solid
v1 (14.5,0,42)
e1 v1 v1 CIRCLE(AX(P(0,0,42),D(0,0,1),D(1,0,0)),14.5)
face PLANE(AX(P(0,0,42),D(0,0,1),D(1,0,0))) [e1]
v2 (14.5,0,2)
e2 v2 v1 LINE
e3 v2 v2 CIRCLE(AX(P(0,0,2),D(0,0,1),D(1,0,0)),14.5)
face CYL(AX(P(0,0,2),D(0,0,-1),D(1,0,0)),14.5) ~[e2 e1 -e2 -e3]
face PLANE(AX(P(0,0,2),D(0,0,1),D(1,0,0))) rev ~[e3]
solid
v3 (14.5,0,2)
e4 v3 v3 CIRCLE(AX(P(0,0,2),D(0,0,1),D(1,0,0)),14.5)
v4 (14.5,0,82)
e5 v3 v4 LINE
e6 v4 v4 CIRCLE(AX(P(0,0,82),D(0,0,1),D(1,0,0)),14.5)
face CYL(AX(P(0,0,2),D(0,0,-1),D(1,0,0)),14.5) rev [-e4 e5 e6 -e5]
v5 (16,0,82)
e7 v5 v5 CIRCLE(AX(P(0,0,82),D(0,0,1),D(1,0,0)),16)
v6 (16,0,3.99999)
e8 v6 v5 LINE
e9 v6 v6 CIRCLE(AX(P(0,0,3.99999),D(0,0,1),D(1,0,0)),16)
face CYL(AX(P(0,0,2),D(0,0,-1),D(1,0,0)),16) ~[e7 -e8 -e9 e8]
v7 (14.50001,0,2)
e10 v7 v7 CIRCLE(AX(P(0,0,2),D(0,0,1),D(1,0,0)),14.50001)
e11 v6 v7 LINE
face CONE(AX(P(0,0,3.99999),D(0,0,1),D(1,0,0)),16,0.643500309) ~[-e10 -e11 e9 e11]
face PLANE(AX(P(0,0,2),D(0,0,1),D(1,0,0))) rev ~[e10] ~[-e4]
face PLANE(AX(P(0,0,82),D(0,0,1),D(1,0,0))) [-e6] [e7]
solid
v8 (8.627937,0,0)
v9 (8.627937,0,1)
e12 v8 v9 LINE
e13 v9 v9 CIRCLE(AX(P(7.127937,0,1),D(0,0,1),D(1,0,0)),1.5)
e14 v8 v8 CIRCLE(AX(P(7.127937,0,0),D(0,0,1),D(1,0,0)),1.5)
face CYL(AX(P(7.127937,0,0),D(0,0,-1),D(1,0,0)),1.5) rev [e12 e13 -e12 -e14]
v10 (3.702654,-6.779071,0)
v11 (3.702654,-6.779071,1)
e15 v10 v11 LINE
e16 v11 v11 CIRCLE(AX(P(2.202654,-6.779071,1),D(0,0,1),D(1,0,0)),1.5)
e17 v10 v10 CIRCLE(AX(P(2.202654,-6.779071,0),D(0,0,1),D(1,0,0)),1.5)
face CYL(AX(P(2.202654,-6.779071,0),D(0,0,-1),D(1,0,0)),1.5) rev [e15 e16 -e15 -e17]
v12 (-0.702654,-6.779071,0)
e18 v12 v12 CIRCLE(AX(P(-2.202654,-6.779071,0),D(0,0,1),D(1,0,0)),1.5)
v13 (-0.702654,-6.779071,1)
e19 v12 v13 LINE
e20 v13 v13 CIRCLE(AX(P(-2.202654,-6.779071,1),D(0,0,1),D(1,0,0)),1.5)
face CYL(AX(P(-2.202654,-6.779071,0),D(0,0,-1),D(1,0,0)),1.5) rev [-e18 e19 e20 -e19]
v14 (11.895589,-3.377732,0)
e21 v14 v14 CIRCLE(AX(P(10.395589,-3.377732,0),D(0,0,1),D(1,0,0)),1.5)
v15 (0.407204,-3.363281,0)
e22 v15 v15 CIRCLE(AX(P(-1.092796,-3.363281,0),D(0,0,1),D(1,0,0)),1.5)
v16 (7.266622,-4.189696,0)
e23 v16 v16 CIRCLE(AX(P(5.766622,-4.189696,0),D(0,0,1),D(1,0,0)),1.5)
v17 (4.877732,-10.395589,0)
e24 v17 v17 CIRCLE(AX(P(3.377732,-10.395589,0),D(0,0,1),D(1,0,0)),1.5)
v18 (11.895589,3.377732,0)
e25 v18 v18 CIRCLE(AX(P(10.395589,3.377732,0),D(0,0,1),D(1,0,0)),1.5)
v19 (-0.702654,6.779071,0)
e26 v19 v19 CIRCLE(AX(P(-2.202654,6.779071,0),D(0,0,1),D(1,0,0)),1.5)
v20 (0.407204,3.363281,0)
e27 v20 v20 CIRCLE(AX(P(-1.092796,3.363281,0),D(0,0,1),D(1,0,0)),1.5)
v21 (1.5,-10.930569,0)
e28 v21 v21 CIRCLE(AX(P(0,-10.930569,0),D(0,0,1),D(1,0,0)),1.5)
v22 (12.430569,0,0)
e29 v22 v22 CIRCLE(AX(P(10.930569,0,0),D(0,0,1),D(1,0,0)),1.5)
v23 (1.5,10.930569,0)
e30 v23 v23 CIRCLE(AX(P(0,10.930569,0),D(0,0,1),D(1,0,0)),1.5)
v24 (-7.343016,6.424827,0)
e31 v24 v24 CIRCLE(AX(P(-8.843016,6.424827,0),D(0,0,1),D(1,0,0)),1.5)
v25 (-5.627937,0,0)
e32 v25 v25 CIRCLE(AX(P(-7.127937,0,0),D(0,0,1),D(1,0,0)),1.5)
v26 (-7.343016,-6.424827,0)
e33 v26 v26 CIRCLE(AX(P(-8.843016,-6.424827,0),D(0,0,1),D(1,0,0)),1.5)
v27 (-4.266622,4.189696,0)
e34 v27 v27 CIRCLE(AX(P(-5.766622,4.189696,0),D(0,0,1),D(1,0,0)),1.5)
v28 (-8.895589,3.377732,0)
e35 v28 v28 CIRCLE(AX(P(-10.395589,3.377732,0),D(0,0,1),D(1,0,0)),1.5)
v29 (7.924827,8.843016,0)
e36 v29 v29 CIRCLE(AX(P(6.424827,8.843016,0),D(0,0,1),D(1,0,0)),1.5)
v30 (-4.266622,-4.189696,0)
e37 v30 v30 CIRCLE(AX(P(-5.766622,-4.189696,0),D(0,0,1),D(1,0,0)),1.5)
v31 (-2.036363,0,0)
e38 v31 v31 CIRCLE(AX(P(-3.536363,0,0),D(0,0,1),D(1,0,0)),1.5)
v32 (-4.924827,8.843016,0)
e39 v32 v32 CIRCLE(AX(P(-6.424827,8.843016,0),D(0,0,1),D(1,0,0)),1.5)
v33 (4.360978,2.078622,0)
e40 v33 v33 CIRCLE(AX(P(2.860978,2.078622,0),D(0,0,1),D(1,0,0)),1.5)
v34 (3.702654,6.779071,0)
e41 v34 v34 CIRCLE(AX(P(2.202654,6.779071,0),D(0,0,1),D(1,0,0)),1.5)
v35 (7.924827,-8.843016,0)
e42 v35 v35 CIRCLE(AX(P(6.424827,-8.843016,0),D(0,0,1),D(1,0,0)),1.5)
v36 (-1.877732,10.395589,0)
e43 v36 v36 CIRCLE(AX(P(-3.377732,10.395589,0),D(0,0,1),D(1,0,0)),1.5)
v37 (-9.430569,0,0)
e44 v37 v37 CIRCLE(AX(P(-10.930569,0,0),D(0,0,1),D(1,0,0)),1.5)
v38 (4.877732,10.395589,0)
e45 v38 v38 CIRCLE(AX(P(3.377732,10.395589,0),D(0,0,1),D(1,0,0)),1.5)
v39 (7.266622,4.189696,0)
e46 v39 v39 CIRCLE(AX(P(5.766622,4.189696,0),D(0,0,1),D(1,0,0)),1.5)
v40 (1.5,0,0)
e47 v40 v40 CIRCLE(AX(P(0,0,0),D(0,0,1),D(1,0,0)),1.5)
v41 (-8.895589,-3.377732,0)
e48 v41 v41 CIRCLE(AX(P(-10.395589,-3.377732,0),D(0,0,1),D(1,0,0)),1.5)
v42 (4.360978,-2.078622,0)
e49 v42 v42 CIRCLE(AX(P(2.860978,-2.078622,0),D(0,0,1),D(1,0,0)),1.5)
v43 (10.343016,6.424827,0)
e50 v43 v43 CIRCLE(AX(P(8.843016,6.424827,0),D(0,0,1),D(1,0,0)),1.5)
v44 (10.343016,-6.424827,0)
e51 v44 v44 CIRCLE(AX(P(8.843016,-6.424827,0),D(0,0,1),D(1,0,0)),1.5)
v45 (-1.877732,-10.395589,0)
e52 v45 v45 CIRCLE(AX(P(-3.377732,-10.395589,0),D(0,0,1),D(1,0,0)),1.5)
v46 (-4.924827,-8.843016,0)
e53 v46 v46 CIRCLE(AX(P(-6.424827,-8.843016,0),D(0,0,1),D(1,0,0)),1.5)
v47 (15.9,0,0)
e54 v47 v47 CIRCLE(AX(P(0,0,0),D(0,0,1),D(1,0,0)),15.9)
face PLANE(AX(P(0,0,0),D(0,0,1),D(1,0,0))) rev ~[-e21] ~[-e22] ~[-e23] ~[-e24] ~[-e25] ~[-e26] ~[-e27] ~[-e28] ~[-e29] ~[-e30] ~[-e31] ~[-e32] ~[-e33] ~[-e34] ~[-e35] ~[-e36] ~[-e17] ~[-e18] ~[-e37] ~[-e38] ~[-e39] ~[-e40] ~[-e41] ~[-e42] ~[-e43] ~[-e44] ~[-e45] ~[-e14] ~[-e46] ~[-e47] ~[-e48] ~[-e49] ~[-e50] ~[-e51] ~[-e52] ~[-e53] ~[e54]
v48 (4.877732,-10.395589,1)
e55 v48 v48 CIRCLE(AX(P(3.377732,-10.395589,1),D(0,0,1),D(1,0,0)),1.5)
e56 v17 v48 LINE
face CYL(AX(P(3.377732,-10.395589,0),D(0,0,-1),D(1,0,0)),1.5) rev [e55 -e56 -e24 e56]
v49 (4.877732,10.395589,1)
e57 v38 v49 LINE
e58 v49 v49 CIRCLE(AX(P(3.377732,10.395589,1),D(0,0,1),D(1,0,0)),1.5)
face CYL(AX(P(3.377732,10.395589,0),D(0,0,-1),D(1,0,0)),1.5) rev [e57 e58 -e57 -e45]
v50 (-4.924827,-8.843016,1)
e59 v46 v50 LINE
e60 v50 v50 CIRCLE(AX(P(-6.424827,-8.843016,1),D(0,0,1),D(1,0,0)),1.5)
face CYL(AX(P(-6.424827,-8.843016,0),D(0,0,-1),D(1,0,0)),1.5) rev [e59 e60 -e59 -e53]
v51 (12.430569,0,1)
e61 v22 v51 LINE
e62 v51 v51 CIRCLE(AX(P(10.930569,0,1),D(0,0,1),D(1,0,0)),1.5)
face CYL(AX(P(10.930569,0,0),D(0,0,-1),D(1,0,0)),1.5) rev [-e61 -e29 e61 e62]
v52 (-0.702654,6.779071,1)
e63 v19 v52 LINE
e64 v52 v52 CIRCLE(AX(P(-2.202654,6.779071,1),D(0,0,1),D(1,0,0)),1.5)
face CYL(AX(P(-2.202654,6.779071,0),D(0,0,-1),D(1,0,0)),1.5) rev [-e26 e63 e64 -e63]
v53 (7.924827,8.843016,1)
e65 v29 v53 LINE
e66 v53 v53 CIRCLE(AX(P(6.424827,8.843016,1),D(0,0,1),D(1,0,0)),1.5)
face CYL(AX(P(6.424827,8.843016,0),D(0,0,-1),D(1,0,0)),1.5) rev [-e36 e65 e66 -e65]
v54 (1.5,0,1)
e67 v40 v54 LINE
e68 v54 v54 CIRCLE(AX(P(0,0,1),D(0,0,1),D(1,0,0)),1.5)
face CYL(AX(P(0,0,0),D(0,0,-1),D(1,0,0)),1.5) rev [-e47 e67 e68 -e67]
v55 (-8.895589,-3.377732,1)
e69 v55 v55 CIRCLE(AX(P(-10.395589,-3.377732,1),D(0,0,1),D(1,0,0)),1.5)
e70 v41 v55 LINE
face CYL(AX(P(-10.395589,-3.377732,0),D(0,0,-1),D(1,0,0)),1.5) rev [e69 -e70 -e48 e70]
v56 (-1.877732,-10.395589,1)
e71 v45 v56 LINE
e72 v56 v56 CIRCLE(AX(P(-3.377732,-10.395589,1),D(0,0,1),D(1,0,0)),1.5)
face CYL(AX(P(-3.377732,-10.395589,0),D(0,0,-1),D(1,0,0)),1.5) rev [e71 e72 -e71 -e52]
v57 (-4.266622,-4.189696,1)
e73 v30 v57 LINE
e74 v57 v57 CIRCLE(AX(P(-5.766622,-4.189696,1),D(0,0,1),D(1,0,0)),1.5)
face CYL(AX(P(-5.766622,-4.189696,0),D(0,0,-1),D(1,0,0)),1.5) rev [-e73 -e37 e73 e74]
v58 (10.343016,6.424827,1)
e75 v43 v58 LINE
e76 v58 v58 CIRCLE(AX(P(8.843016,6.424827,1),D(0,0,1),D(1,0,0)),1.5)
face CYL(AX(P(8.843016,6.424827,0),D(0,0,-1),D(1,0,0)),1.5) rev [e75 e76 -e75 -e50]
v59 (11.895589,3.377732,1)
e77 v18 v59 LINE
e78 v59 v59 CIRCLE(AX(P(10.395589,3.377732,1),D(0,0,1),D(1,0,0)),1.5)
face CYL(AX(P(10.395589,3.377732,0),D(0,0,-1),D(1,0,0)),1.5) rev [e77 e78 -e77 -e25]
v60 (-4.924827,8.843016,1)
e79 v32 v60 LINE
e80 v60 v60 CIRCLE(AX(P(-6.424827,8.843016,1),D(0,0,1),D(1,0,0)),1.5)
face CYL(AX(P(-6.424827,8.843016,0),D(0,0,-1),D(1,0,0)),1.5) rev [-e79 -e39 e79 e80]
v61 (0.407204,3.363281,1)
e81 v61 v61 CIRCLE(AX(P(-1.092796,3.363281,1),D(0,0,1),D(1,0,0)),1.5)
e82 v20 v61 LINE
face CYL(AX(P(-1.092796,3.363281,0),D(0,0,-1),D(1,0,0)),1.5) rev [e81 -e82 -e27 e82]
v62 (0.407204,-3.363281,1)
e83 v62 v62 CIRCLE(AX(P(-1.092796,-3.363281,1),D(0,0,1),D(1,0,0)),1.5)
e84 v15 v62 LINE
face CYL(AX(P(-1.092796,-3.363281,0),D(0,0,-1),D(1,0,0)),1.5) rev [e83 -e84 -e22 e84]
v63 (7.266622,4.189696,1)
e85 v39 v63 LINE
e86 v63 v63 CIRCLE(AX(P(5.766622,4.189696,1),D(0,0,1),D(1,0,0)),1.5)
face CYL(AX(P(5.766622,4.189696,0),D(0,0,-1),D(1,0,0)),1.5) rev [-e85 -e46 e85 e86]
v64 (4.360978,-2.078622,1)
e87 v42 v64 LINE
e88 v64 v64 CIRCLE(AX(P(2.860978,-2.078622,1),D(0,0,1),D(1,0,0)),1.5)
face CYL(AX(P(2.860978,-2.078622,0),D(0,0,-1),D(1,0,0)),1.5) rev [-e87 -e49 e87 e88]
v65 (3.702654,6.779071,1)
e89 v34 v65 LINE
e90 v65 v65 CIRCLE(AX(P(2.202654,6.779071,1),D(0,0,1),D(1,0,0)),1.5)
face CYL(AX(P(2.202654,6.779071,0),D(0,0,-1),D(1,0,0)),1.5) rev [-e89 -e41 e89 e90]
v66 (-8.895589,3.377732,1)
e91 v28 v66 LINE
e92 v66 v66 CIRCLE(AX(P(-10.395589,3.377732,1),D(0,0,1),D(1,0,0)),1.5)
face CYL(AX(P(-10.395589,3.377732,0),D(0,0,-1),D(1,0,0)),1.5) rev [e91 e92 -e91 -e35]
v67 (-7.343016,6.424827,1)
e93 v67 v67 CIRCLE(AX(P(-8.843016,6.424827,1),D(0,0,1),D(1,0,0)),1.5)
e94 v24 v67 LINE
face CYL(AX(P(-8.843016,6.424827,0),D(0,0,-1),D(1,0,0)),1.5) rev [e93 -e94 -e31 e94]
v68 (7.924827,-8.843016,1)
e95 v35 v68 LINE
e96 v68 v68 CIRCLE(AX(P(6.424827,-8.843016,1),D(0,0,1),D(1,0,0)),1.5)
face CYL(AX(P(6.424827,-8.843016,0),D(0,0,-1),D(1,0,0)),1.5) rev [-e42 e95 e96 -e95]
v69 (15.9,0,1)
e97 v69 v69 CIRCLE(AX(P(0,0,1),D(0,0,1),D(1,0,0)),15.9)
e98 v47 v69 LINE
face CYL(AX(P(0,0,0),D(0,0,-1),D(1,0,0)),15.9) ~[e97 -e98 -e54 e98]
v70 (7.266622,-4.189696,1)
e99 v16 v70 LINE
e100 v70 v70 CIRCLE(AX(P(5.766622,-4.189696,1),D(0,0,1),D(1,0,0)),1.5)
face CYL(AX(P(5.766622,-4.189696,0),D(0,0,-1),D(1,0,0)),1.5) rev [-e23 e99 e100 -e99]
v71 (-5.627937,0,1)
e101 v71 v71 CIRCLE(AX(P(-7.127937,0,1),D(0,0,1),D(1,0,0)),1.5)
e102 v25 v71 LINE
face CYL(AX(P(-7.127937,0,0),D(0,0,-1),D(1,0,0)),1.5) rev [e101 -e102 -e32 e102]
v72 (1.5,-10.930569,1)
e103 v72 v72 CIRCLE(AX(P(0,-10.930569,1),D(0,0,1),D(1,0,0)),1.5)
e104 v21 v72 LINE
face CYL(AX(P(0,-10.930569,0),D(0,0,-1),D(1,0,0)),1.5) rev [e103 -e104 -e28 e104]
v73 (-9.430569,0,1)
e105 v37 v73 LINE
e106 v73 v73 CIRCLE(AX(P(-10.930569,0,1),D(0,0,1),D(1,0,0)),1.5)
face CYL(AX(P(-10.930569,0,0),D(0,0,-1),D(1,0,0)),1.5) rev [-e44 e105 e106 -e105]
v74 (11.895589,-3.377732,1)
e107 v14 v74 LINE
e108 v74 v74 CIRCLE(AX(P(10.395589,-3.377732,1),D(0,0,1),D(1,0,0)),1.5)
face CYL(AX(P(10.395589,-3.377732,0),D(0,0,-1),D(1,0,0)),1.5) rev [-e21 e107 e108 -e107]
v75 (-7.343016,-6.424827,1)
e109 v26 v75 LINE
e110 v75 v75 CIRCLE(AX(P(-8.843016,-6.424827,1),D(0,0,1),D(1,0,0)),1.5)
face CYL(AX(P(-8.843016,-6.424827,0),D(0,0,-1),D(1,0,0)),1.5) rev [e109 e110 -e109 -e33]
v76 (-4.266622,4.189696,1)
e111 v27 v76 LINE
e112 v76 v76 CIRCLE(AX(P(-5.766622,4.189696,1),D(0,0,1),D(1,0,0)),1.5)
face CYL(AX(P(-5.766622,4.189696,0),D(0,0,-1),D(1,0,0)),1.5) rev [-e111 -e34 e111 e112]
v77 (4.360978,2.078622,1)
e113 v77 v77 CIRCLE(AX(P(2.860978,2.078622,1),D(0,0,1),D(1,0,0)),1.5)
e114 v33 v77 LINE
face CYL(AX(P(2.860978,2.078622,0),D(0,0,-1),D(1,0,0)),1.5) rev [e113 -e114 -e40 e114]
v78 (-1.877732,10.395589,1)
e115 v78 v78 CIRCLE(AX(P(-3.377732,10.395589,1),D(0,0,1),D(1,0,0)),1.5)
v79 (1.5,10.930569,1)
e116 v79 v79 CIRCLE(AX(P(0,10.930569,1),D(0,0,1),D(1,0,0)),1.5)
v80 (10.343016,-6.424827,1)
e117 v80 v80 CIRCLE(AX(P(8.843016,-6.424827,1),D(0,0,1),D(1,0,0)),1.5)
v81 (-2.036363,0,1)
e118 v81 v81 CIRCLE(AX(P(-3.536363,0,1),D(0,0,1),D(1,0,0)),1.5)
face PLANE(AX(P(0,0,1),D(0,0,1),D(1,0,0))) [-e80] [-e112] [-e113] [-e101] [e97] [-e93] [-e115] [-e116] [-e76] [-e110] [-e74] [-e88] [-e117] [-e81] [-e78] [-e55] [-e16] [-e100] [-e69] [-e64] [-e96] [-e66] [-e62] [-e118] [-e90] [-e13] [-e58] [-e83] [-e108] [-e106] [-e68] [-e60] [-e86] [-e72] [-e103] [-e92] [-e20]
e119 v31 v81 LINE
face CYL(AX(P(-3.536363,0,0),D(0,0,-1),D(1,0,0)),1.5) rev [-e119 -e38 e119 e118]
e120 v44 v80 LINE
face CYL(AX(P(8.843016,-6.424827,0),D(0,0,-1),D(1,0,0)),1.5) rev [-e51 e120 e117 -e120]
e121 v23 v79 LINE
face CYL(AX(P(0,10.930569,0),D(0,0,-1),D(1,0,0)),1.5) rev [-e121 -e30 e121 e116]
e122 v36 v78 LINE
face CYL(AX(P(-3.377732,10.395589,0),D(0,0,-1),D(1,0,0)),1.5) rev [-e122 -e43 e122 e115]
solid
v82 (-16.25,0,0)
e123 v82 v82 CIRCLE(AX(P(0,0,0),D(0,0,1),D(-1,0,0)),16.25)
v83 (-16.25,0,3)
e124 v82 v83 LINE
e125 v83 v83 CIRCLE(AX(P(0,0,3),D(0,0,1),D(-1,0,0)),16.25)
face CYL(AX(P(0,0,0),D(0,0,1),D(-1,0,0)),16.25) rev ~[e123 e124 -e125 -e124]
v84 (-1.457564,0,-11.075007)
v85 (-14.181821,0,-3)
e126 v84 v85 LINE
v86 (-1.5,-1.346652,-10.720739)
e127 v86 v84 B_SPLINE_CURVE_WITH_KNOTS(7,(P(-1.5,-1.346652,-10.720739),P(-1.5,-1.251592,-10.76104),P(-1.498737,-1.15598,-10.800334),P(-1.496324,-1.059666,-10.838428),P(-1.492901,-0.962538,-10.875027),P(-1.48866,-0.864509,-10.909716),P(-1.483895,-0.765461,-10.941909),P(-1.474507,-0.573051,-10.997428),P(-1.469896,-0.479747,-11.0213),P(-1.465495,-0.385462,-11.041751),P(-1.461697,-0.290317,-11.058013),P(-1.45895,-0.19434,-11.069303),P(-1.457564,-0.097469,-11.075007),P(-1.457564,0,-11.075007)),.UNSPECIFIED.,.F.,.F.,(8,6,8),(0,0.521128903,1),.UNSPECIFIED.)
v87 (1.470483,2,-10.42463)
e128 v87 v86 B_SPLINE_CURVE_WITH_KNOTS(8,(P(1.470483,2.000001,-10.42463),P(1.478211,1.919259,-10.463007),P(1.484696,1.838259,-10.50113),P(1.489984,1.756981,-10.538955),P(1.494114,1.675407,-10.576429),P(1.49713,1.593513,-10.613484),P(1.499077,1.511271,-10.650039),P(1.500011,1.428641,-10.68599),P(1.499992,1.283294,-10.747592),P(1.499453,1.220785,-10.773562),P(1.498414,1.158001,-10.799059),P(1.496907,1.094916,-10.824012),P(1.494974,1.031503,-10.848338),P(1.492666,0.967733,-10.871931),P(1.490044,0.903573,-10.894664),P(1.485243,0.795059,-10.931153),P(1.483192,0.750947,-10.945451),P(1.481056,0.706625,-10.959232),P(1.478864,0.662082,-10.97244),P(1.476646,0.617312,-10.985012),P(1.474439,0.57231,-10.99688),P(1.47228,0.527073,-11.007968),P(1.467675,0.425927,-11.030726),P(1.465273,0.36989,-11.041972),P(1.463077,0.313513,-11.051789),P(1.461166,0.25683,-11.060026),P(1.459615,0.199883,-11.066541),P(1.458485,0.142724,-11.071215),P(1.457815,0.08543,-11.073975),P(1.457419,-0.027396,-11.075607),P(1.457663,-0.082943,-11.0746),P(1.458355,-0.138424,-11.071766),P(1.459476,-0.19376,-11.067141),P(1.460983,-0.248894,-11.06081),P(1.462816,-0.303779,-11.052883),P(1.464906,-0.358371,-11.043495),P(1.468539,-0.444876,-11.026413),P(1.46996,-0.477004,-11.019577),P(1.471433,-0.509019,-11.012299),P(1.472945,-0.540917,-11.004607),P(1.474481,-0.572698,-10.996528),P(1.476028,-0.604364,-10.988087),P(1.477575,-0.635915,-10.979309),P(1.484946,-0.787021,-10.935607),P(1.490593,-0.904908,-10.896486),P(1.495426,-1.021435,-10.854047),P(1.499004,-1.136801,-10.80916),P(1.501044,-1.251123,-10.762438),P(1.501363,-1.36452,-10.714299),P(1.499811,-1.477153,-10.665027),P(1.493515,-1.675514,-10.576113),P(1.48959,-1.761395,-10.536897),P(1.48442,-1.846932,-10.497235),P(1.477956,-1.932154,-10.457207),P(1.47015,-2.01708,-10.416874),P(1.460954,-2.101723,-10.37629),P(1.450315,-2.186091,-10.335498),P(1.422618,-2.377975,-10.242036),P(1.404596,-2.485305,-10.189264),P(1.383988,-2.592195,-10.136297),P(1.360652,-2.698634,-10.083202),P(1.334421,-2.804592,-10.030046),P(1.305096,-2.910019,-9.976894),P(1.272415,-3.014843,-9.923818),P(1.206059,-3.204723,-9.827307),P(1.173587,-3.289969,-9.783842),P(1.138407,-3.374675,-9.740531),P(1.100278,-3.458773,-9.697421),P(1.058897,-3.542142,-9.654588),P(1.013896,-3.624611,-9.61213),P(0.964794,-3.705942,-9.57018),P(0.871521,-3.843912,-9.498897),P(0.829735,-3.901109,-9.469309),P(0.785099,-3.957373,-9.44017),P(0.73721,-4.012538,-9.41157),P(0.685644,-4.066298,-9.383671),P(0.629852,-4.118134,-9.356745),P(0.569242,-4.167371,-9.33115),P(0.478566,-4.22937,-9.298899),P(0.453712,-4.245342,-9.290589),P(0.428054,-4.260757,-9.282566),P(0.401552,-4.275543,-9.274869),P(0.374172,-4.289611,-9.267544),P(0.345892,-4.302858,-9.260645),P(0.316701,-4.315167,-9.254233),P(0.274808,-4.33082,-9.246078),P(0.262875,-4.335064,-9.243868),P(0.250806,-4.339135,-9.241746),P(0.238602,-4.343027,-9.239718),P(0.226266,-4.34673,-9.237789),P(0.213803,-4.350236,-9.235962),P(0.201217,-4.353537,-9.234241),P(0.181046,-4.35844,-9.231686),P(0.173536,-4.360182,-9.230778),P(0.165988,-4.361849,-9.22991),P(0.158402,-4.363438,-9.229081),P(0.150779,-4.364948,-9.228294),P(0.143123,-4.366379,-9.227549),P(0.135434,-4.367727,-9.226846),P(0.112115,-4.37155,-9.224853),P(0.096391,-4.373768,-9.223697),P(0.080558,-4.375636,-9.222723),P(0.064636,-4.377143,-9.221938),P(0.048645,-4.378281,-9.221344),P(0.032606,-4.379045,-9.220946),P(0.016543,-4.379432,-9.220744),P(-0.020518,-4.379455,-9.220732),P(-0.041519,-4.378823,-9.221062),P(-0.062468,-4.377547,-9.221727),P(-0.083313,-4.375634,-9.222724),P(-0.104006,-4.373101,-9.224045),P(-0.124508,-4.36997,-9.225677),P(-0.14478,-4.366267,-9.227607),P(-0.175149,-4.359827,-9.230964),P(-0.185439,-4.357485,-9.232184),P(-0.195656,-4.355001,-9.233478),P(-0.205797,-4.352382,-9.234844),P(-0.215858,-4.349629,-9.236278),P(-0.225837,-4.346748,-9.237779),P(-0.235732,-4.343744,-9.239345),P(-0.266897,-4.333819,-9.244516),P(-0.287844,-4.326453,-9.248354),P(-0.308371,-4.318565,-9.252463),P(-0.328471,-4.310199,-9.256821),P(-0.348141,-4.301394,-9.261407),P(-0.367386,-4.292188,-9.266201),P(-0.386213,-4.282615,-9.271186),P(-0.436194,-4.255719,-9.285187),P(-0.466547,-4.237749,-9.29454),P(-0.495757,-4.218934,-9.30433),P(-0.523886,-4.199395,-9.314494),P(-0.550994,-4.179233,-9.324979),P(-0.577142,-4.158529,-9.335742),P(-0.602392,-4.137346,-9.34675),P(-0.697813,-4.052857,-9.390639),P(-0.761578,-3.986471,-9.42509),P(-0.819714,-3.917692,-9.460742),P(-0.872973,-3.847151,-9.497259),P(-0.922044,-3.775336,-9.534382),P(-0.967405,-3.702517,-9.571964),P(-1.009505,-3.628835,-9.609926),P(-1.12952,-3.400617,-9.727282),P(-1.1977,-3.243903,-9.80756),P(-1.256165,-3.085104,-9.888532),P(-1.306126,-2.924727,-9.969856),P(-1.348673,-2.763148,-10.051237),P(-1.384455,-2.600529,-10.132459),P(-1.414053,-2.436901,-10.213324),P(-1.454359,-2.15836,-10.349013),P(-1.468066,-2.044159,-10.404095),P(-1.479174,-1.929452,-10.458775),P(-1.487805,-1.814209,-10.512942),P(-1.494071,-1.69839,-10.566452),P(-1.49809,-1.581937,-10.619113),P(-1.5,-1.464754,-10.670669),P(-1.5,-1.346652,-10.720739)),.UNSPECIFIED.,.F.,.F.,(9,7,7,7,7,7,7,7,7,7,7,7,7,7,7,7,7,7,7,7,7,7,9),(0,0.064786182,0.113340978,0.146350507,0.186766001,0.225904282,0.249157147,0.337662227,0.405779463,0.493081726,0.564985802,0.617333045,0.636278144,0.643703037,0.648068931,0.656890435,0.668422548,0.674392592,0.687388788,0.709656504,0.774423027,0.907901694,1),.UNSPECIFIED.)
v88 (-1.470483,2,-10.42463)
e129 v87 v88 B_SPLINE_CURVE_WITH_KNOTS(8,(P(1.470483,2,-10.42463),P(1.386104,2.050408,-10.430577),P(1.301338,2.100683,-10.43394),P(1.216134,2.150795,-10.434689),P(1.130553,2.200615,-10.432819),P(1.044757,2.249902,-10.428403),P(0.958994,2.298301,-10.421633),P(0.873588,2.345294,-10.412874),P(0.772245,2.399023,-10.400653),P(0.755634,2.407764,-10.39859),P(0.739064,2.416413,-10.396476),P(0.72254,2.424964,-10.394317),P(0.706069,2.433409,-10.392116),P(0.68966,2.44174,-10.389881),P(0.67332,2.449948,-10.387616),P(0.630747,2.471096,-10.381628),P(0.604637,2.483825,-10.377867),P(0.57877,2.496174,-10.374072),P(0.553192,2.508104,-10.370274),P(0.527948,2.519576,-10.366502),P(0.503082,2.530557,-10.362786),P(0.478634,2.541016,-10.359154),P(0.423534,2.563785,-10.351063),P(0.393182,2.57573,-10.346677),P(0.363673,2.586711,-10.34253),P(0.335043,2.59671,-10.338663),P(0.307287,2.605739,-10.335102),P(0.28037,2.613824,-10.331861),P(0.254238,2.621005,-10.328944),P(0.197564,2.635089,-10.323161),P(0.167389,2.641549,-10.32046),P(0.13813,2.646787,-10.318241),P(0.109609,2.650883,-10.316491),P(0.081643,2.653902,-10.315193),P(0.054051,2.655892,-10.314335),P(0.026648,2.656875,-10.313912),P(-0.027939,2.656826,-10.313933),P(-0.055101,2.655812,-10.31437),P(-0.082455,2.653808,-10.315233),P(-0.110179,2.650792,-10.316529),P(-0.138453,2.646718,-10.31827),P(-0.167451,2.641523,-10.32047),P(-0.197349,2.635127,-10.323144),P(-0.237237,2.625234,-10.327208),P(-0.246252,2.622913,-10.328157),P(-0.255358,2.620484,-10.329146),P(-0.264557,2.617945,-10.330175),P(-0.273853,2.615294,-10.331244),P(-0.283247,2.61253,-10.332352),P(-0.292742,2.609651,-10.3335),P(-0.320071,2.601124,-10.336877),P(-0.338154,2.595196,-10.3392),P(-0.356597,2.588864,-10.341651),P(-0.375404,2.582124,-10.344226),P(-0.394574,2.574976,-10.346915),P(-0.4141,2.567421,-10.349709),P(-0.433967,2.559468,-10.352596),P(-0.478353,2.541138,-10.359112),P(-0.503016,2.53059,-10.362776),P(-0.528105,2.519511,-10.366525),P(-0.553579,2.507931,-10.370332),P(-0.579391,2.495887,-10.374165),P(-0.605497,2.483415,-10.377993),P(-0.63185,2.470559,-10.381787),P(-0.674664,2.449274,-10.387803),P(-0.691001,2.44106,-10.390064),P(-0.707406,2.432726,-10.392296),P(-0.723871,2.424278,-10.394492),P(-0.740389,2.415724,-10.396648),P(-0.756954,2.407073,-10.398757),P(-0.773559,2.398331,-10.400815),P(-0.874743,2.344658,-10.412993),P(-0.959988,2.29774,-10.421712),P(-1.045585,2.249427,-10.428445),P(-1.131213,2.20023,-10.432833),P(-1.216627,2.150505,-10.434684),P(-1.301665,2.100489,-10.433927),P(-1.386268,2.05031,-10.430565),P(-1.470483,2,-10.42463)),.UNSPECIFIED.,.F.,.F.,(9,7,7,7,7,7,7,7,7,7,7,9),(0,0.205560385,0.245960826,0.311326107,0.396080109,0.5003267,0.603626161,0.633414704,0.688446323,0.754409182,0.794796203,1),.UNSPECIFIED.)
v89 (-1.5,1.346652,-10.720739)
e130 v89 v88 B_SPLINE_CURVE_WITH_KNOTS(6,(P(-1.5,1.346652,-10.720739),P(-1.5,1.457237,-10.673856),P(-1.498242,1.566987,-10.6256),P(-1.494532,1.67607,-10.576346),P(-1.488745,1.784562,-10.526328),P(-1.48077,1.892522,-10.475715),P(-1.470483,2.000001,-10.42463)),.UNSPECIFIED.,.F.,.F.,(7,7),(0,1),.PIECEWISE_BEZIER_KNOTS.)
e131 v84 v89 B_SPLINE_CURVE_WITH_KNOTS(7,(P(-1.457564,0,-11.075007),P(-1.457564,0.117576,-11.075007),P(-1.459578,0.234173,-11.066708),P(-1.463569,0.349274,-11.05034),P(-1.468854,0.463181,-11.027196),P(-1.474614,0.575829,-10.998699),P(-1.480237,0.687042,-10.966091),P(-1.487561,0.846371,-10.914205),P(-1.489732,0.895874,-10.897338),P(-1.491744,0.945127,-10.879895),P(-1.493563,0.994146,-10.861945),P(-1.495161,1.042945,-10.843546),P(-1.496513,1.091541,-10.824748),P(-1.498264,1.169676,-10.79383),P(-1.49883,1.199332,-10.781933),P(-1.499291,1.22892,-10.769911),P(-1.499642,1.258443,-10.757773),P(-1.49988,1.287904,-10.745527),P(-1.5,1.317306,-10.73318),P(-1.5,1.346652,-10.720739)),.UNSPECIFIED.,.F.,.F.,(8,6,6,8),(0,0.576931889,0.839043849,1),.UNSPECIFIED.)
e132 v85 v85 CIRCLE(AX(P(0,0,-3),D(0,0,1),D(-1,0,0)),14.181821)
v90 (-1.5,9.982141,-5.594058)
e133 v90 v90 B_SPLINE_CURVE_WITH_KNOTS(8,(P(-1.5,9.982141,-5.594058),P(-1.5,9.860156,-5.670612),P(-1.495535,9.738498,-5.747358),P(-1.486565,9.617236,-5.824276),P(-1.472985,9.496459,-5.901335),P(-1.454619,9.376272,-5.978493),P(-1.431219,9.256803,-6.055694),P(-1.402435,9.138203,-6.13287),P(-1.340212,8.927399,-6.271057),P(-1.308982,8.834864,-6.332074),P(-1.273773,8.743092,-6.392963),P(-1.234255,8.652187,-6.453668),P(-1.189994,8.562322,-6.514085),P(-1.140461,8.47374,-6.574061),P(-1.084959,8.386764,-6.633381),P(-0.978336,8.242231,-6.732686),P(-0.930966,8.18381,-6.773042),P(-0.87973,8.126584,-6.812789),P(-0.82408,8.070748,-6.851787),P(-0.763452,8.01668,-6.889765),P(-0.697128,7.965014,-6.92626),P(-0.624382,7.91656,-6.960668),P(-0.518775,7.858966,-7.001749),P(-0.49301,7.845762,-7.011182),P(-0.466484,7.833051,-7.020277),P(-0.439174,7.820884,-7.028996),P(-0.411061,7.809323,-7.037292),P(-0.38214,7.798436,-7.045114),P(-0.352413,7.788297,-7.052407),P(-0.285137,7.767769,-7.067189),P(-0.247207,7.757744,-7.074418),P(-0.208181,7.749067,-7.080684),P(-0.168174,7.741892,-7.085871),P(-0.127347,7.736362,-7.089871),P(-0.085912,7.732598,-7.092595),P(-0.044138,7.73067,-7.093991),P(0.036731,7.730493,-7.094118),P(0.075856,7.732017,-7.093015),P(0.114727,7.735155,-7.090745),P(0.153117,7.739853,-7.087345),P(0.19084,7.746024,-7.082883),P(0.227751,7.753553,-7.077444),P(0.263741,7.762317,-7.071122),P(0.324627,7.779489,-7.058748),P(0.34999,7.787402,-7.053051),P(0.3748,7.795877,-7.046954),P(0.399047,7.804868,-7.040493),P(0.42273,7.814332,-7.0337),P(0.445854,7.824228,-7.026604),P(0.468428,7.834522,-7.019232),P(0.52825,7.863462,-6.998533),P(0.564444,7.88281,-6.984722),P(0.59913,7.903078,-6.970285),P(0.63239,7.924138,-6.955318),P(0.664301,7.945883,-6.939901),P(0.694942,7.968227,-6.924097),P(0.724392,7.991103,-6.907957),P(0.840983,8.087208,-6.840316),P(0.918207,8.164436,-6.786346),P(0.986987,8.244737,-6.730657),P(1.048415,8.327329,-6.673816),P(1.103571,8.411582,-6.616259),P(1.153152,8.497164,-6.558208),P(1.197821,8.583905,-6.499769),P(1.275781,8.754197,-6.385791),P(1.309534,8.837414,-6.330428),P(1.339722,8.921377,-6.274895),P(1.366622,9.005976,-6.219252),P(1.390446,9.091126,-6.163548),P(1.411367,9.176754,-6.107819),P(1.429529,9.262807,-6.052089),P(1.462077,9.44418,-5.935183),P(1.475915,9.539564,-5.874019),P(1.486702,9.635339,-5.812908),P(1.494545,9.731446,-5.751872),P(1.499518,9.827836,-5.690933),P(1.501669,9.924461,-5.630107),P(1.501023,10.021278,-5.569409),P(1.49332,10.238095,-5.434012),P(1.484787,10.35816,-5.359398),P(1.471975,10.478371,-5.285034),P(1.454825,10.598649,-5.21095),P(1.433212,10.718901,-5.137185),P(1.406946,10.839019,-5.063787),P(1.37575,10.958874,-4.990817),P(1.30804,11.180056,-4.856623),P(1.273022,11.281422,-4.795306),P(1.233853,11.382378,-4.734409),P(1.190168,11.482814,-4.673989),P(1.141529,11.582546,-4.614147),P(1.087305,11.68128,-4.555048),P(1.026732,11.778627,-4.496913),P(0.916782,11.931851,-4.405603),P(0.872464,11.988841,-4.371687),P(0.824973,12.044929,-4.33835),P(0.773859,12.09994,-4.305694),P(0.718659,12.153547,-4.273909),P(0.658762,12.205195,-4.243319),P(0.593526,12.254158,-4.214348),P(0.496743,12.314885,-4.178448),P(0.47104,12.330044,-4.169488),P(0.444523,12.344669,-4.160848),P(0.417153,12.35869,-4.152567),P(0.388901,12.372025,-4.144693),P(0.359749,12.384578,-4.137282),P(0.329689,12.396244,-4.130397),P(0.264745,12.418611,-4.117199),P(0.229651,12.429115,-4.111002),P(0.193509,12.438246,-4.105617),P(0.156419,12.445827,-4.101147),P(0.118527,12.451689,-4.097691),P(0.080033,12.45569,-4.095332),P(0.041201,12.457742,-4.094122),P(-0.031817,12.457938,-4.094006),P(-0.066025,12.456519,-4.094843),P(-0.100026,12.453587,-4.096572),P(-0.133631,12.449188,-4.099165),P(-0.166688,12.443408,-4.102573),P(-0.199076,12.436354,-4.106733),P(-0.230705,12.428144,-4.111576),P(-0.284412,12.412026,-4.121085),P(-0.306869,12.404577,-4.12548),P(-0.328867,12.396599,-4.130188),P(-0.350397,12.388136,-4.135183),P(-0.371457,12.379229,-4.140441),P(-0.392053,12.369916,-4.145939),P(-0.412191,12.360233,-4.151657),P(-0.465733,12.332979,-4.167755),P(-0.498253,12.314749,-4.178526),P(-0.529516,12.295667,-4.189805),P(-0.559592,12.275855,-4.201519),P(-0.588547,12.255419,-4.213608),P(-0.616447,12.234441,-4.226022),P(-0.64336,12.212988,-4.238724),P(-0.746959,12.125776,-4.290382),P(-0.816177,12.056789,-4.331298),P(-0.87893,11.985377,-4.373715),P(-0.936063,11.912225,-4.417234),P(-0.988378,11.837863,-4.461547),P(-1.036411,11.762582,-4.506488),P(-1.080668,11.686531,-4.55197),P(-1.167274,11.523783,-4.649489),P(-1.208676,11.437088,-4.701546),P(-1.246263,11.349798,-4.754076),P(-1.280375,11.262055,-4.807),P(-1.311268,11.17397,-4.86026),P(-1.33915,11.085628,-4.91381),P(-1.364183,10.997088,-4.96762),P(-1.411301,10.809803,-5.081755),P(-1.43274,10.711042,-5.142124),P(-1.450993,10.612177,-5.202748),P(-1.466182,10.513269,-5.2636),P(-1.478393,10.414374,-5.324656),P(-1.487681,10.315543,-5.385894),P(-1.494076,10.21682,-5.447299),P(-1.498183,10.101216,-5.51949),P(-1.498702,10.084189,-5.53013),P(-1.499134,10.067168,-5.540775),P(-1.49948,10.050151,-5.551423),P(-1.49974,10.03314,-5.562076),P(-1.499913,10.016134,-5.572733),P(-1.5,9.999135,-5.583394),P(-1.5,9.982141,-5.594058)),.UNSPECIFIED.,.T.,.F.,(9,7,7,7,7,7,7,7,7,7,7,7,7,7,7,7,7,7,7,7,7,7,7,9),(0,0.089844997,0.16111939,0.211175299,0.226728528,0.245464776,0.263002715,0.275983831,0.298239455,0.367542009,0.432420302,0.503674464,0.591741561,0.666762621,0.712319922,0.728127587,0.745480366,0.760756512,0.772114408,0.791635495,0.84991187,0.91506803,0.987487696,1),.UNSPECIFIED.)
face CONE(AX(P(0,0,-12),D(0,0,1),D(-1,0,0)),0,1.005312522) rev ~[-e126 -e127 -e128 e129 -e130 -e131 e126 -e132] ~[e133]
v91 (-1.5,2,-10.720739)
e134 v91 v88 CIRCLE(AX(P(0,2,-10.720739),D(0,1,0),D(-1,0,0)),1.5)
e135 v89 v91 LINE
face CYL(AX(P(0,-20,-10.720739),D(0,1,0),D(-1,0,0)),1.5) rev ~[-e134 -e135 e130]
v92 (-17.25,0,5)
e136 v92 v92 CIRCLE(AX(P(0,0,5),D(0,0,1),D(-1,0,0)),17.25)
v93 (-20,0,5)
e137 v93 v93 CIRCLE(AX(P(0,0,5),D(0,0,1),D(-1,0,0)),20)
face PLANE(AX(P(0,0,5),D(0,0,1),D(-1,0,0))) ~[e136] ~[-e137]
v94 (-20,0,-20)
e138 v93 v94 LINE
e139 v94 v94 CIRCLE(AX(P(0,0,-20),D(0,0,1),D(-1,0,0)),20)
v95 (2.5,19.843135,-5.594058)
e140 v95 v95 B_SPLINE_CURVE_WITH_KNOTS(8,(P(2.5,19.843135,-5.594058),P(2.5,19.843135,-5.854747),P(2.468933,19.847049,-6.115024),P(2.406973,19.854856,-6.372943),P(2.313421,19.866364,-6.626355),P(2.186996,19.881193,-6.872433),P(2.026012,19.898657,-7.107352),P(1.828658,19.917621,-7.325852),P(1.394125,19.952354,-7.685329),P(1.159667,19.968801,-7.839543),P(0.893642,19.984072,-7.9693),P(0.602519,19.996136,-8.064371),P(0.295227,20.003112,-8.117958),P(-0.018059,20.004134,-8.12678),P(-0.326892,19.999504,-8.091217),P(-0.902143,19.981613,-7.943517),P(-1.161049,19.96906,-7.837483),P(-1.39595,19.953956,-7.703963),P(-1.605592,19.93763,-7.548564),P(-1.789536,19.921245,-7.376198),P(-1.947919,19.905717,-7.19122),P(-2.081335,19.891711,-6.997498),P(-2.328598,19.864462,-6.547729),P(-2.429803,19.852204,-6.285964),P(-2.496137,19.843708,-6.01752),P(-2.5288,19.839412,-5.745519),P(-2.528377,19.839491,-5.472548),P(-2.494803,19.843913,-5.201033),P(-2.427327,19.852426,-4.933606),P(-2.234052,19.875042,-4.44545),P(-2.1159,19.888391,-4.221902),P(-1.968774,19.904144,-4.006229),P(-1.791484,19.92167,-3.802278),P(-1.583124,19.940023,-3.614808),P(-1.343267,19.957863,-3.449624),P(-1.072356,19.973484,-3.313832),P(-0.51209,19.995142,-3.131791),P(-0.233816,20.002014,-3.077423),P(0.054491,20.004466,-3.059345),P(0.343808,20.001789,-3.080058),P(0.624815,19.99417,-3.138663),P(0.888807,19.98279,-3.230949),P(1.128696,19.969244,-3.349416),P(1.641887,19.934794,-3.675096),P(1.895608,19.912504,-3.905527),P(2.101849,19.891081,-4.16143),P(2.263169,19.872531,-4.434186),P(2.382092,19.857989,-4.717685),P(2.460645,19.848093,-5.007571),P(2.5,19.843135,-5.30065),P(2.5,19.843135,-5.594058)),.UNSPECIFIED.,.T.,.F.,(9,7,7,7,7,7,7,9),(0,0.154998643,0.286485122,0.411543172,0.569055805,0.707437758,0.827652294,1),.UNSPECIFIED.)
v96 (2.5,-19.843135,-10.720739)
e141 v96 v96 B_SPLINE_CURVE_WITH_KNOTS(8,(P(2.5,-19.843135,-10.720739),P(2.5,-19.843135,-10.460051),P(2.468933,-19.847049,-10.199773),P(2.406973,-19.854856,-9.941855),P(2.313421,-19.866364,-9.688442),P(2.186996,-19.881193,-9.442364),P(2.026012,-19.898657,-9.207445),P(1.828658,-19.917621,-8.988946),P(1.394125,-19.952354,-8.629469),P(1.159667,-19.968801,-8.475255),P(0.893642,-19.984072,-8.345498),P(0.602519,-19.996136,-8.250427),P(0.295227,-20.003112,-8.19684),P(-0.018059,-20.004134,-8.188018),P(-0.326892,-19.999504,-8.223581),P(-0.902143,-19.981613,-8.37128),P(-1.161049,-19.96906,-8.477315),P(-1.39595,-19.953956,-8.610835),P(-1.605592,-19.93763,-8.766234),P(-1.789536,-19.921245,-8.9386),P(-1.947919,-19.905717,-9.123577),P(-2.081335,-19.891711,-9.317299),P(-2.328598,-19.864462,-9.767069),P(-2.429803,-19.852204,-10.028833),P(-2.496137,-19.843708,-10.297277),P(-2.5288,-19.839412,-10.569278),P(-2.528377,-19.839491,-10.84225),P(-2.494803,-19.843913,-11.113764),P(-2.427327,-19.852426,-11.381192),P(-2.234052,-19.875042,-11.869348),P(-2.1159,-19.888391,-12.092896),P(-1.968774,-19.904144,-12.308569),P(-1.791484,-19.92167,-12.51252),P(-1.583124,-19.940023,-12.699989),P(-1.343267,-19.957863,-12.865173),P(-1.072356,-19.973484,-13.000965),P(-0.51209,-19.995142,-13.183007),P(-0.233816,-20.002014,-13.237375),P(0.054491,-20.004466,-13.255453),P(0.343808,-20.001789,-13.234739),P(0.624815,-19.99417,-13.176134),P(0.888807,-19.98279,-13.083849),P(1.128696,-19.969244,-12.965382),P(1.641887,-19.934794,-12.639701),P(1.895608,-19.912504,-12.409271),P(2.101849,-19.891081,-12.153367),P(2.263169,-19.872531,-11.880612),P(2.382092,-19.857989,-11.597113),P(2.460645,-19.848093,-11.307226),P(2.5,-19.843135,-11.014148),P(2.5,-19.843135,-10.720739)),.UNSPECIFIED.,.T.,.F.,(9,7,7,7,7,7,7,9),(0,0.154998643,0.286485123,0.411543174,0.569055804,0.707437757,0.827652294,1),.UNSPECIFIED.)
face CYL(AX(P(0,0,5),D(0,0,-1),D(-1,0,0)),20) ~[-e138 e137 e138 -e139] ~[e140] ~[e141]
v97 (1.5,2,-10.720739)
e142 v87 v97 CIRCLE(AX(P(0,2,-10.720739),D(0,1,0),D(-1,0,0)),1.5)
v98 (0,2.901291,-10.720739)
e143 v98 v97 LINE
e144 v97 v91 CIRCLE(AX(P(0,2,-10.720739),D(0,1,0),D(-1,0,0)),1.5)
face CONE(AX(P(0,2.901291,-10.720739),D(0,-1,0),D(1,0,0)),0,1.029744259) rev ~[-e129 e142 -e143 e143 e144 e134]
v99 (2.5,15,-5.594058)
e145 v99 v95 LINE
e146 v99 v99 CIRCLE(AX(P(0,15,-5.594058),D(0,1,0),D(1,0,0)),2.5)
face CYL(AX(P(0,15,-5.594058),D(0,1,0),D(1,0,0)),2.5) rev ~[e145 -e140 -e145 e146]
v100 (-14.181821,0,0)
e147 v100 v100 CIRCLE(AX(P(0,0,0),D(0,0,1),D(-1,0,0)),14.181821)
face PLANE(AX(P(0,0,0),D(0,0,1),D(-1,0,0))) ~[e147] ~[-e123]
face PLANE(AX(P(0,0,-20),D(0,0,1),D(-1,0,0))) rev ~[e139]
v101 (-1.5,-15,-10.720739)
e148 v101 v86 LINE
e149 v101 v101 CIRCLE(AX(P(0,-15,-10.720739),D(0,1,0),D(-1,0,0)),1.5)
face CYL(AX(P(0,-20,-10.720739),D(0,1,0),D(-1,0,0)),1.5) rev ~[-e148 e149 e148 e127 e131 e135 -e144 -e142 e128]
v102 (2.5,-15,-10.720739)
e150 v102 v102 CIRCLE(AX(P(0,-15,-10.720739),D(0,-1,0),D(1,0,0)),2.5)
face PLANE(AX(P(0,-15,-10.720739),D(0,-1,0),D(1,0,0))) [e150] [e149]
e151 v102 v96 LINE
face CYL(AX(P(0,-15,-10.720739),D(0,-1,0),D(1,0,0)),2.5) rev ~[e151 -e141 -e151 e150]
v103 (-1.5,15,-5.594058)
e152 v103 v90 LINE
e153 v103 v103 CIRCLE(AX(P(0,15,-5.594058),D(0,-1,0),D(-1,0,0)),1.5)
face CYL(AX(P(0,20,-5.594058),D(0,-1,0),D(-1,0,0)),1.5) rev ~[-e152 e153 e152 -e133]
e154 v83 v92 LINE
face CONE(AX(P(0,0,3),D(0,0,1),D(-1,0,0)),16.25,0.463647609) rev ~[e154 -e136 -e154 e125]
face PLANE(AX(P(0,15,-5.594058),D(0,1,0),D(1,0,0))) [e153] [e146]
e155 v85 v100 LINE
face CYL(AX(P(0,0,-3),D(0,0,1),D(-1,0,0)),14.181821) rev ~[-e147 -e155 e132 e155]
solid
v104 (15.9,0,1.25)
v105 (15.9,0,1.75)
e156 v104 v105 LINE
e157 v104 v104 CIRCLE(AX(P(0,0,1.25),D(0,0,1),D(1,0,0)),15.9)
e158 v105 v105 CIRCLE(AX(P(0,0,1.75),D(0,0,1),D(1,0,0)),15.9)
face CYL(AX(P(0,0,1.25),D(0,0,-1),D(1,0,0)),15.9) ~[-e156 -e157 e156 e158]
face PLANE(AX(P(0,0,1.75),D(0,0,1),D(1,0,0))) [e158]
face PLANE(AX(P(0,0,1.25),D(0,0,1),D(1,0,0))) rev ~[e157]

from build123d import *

# Parameters (mm, degrees)
F0_R           = 16
F0_R_2         = 14.5
F1_DEPTH       = 80
F6_D           = 3
F6_DEPTH       = 22
F6_CBORE_D     = 5
F6_CBORE_DEPTH = 5
F6_TIP         = 0.9012909285
F9_D           = 3
F9_DEPTH       = 22
F9_CBORE_D     = 5
F9_CBORE_DEPTH = 5
F9_TIP         = 0.9012909285
F11_R          = 15.9
F12_DEPTH      = 1
F13_R          = 1.5
F14_DEPTH      = 1
F15_R          = 14.5
F16_DEPTH      = 40
F18_R          = 15.9
F19_DEPTH      = 0.5
F21_SIZE2      = 1
F21_SIZE       = 2
F22_SIZE2      = 1.49999
F22_SIZE       = 1.99999


# Not quite as in the source:
# - a fillet or chamfer is up to 0.001 mm smaller than in the source, because OpenCascade refuses the exact size


with BuildPart() as f1:
    # F0 (on Top) → F1 (new body)
    with BuildSketch(Plane.XY):
        Circle(F0_R)
        Circle(F0_R_2, mode=Mode.SUBTRACT)
    extrude(amount=F1_DEPTH)


with BuildPart() as f3:
    # F2 (on Front) → F3 (revolve)
    with BuildSketch(Plane.XZ):
        Polygon((-14.1818207945, 0), (-16.25, 0), (-16.25, 5), (-20, 5), (-20, -20), (0, -20), (0, -12), (-14.1818207945, -3), align=None)
    revolve(axis=Axis((0, 0, -16), (0, 0, 1)))

    # F6
    with Locations(Plane.XZ.offset(20)):
        with Locations((0, -10.7207391411)):
            CounterBoreHole(F6_D / 2, F6_CBORE_D / 2, F6_CBORE_DEPTH, depth=F6_DEPTH)
            with Locations((0, 0, -(F6_DEPTH + F6_TIP / 2))):  # 118° drill point
                Cone(0, F6_D / 2, F6_TIP, mode=Mode.SUBTRACT)

    # F9
    with Locations(Plane(origin=(0, 20, 0), x_dir=(1, 0, 0), z_dir=(0, 1, 0))):
        with Locations((0, 5.594058428)):
            CounterBoreHole(F9_D / 2, F9_CBORE_D / 2, F9_CBORE_DEPTH, depth=F9_DEPTH)
            with Locations((0, 0, -(F9_DEPTH + F9_TIP / 2))):  # 118° drill point
                Cone(0, F9_D / 2, F9_TIP, mode=Mode.SUBTRACT)

    # F21
    f21_edges = [f3.edges().sort_by_distance(p)[0] for p in [
        (16.25, 0, 5),
    ]]
    f21_side = f3.faces().sort_by_distance((16.25, 0, 2.5))[0]
    chamfer(f21_edges, length=F21_SIZE, length2=F21_SIZE2, reference=f21_side)


with BuildPart() as f1_1:
    # F10: moved
    add(f1.part.moved(Location((0, 0, 2))))

    # F22 (size 2 and 1.5 in the source; OpenCascade refuses exactly that, so slightly less here)
    f22_edges = [f1_1.edges().sort_by_distance(p)[0] for p in [
        (-16, 0, 2),
    ]]
    f22_side = f1_1.faces().sort_by_distance((-16, 0, 42))[0]
    chamfer(f22_edges, length=F22_SIZE, length2=F22_SIZE2, reference=f22_side)


with BuildPart() as f12:
    # F11 (on Top) → F12 (new body)
    with BuildSketch(Plane.XY):
        Circle(F11_R)
    extrude(amount=F12_DEPTH)

    # F13 (on Top) → F14 (cut)
    with BuildSketch(Plane.XY):
        with Locations((6.4248272051, -8.8430160073)):
            Circle(F13_R)
        with Locations((-6.4248272051, -8.8430160073)):
            Circle(F13_R)
        with Locations((-10.3955887897, -3.3777315517)):
            Circle(F13_R)
        with Locations((0, -10.9305689111)):
            Circle(F13_R)
        with Locations((-6.4248272051, 8.8430160073)):
            Circle(F13_R)
        with Locations((3.3777315517, 10.3955887897)):
            Circle(F13_R)
        with Locations((-10.3955887897, 3.3777315517)):
            Circle(F13_R)
        with Locations((0, 10.9305689111)):
            Circle(F13_R)
        with Locations((-5.7666221108, 4.1896962064)):
            Circle(F13_R)
        with Locations((2.8609776839, 2.0786219591)):
            Circle(F13_R)
        with Locations((-5.7666221108, -4.1896962064)):
            Circle(F13_R)
        with Locations((-3.3777315517, 10.3955887897)):
            Circle(F13_R)
        with Locations((8.8430160073, -6.4248272051)):
            Circle(F13_R)
        with Locations((-3.5363628995, 0)):
            Circle(F13_R)
        with Locations((-2.202653646, -6.7790708645)):
            Circle(F13_R)
        with Locations((-2.202653646, 6.7790708645)):
            Circle(F13_R)
        with Locations((8.8430160073, 6.4248272051)):
            Circle(F13_R)
        with Locations((2.202653646, 6.7790708645)):
            Circle(F13_R)
        with Locations((6.4248272051, 8.8430160073)):
            Circle(F13_R)
        Circle(F13_R)
        with Locations((10.3955887897, -3.3777315517)):
            Circle(F13_R)
        with Locations((10.9305689111, 0)):
            Circle(F13_R)
        with Locations((5.7666221108, 4.1896962064)):
            Circle(F13_R)
        with Locations((5.7666221108, -4.1896962064)):
            Circle(F13_R)
        with Locations((10.3955887897, 3.3777315517)):
            Circle(F13_R)
        with Locations((2.202653646, -6.7790708645)):
            Circle(F13_R)
        with Locations((-7.1279369295, 0)):
            Circle(F13_R)
        with Locations((-1.0927962342, -3.3632809795)):
            Circle(F13_R)
        with Locations((3.3777315517, -10.3955887897)):
            Circle(F13_R)
        with Locations((2.8609776839, -2.0786219591)):
            Circle(F13_R)
        with Locations((-1.0927962342, 3.3632809795)):
            Circle(F13_R)
        with Locations((-3.3777315517, -10.3955887897)):
            Circle(F13_R)
        with Locations((-8.8430160073, -6.4248272051)):
            Circle(F13_R)
        with Locations((-10.9305689111, 0)):
            Circle(F13_R)
        with Locations((-8.8430160073, 6.4248272051)):
            Circle(F13_R)
        with Locations((7.1279369295, 0)):
            Circle(F13_R)
    extrude(amount=F14_DEPTH, mode=Mode.SUBTRACT)


with BuildPart() as f16:
    # F15 (on Top) → F16 (new body)
    with BuildSketch(Plane.XY):
        Circle(F15_R)
    extrude(amount=F16_DEPTH)


with BuildPart() as f16_1:
    # F17: moved
    add(f16.part.moved(Location((0, 0, 2))))


with BuildPart() as f19:
    # F18 (on Top) → F19 (new body)
    with BuildSketch(Plane.XY):
        Circle(F18_R)
    extrude(amount=F19_DEPTH)


with BuildPart() as f19_1:
    # F20: moved
    add(f19.part.moved(Location((0, 0, 1.25))))


with BuildPart() as f23_1:
    # F23: copy of F3
    add(f3.part)


solid = Compound([f1_1.part, f12.part, f16_1.part, f19_1.part, f23_1.part])
